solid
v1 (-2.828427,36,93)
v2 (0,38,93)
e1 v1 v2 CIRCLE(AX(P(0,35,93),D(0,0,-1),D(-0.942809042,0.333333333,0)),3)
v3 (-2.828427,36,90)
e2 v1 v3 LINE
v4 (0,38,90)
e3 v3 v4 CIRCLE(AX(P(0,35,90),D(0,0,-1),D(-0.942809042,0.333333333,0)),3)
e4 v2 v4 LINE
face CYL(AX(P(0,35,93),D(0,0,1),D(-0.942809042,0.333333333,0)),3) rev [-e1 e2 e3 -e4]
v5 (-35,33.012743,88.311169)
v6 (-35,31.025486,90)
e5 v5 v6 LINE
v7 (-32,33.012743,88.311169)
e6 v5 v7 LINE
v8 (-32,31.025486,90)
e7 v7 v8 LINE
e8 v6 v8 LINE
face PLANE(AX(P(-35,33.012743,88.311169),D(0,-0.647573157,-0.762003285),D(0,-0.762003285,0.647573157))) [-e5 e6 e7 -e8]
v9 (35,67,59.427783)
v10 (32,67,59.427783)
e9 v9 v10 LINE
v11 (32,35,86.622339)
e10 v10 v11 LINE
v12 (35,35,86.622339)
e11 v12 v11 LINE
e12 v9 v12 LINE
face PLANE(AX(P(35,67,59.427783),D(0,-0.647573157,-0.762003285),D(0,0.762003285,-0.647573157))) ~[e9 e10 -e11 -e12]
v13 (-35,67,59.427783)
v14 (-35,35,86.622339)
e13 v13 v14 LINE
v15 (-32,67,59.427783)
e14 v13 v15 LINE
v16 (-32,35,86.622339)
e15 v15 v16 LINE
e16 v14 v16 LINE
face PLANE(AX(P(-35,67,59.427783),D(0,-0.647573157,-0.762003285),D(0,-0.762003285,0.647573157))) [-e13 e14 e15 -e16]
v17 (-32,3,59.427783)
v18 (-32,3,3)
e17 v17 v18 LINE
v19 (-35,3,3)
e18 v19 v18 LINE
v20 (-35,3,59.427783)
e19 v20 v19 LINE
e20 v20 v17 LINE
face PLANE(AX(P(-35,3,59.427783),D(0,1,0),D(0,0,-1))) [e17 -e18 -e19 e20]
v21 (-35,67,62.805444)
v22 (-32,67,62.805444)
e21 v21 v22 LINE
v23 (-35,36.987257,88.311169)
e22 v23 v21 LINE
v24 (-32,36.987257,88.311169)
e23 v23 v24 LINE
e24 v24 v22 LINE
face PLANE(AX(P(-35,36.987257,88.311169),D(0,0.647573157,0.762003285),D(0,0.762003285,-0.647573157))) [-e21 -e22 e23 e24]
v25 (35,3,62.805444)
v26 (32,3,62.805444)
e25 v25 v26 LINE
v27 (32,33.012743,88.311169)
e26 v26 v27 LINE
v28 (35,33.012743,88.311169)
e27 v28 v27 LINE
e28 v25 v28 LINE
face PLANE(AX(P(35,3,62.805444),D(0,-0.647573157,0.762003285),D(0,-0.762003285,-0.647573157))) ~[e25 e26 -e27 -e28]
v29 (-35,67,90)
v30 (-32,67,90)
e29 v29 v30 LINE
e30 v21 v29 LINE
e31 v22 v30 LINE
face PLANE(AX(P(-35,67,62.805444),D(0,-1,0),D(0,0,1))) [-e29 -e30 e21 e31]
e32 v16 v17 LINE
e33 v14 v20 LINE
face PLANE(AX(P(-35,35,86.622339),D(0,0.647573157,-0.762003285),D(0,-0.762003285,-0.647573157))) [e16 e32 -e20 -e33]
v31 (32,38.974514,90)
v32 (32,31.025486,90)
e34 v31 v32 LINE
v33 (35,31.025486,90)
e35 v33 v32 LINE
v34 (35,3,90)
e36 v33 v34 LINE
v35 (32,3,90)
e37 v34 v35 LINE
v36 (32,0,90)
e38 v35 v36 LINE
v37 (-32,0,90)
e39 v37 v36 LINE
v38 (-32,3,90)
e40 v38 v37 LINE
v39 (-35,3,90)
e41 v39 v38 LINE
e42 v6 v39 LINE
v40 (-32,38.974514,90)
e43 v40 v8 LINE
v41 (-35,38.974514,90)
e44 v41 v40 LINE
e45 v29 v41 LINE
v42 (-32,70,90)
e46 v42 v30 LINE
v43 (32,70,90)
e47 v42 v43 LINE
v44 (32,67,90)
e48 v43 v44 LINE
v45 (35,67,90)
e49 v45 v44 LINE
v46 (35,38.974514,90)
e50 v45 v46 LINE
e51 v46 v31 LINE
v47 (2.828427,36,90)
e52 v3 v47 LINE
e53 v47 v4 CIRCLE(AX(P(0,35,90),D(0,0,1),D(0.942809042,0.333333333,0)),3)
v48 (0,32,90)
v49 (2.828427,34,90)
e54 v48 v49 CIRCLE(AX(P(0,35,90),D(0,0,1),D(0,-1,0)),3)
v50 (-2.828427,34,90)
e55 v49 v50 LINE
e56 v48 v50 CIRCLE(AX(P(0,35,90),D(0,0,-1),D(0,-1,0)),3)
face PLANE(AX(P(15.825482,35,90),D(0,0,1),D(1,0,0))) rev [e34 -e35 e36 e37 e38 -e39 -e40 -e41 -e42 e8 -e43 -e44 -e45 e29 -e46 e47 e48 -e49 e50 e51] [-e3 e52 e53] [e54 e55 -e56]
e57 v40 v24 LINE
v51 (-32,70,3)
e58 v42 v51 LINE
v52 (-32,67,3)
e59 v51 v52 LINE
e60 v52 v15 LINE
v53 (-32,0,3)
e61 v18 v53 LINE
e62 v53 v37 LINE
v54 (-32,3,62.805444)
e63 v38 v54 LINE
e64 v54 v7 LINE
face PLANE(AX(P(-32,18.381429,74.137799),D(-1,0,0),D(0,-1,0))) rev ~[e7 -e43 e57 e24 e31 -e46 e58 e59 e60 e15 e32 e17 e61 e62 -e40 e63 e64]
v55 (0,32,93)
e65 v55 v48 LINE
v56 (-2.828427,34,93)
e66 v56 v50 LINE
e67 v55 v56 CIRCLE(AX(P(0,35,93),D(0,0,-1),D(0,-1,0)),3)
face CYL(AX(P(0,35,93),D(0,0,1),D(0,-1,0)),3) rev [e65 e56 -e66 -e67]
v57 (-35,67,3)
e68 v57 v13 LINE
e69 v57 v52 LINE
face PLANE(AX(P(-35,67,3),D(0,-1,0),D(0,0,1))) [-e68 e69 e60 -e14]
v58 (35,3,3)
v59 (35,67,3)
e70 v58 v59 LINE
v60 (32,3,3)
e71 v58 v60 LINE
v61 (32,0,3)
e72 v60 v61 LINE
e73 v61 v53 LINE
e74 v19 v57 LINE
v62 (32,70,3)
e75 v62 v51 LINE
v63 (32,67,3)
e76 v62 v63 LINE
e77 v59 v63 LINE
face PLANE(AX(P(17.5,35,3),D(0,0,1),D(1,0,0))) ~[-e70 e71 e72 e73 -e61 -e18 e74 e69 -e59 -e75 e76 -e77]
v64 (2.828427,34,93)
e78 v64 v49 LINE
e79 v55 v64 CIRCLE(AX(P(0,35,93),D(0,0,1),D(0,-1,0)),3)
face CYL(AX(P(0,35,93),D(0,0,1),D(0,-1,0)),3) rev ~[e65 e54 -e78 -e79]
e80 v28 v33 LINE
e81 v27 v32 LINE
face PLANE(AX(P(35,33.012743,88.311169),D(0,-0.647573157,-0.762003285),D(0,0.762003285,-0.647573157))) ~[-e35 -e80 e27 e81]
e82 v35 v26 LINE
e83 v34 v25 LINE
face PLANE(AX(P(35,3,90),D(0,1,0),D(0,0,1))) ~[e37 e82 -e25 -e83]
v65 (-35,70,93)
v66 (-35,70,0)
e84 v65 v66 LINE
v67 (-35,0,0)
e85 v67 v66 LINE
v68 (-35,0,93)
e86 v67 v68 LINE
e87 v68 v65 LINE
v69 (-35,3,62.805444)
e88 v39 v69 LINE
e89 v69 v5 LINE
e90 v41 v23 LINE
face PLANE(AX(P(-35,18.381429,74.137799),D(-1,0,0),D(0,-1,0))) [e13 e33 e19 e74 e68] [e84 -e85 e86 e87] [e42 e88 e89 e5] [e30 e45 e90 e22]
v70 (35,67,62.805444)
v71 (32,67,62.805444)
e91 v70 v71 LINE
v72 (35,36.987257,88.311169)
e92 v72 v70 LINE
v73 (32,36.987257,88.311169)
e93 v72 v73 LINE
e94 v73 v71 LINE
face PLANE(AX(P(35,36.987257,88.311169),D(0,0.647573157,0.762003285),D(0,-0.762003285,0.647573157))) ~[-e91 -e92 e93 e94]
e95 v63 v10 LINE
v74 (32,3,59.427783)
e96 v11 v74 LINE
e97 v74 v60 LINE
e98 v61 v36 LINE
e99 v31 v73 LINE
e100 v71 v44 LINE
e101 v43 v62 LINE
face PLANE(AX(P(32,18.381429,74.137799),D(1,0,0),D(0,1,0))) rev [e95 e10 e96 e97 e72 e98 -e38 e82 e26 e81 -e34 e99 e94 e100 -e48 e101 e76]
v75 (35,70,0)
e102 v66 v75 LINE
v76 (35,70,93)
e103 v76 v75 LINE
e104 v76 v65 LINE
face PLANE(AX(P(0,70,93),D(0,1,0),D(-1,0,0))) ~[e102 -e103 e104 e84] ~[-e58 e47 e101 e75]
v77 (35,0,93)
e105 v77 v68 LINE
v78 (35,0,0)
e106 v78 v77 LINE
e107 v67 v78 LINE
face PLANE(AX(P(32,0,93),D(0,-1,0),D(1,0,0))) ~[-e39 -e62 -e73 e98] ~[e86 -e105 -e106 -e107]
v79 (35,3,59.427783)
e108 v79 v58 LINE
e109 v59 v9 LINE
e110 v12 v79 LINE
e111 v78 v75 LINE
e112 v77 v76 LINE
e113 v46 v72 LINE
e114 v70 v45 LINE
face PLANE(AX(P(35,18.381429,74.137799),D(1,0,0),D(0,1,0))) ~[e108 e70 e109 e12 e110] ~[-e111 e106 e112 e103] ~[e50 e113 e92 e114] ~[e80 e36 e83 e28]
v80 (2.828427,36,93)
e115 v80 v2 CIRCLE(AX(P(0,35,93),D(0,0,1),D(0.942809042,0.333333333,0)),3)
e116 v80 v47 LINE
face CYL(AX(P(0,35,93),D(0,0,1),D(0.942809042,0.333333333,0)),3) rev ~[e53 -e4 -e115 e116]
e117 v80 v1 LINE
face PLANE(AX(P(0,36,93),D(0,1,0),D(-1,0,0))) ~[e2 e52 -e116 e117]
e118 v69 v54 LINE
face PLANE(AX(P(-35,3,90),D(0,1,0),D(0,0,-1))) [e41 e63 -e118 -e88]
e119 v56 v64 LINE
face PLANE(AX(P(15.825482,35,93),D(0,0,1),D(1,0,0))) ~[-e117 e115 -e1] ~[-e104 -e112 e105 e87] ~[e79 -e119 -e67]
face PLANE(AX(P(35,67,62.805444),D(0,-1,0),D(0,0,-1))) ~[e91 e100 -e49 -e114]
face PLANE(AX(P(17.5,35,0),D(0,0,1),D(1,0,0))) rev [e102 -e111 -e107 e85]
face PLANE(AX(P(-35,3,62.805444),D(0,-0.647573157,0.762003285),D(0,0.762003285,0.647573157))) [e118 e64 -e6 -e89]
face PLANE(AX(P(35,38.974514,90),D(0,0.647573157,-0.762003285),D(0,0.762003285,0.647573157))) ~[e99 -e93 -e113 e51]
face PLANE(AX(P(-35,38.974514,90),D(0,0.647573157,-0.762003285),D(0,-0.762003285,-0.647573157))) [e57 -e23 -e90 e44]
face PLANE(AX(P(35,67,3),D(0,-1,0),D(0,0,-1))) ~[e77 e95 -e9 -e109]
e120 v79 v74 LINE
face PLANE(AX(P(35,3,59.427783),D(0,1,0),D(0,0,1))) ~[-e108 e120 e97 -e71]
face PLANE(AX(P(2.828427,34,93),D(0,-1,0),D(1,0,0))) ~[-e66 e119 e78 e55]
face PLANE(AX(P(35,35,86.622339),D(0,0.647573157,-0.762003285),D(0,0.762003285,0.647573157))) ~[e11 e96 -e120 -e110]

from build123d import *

# Parameters (mm, degrees)
F0_W     = 35
F0_H     = 70
F1_DEPTH = 3
F3_DEPTH = 3
F5_DEPTH = 3


# Not quite as in the source:
# - a feature names something its author has since deleted; it is built from what else it names


with BuildPart() as f1:
    # F0 (on Top) → F1 (new body)
    with BuildSketch(Plane.XY):
        with Locations((-17.5, 35)):
            Rectangle(F0_W, F0_H)
    extrude(amount=F1_DEPTH)

    # F2 (on face) → F3 (join)
    with BuildSketch(Plane(origin=(-35, 0, 0), x_dir=(0, -1, 0), z_dir=(-1, 0, 0))):
        Polygon((-35, 86.622338891), (-3, 59.4277828932), (-3, 62.8054440022), (-33.0127427803, 88.3111694455), align=None)
        Polygon((-67, 62.8054440022), (-67, 59.4277828932), (-35, 86.622338891), (-36.9872572197, 88.3111694455), align=None)
        Polygon((-70, 93), (-70, 90), (-67, 90), (-38.9745144394, 90), (-35, 90), (-35, 93), align=None)
        Polygon((0, 93), (-35, 93), (-35, 90), (-31.0254855606, 90), (-3, 90), (0, 90), align=None)
        Polygon((-35, 90), (-33.0127427803, 88.3111694455), (-31.0254855606, 90), align=None)
        Polygon((-36.9872572197, 88.3111694455), (-35, 86.622338891), (-33.0127427803, 88.3111694455), (-35, 90), align=None)
        Polygon((-35, 90), (-38.9745144394, 90), (-36.9872572197, 88.3111694455), align=None)
        Polygon((-70, 90), (-70, 3), (-67, 3), (-67, 59.4277828932), (-67, 62.8054440022), (-67, 90), align=None)
        Polygon((-3, 59.4277828932), (-3, 3), (0, 3), (0, 90), (-3, 90), (-3, 62.8054440022), align=None)
    extrude(amount=-F3_DEPTH)

    # F4 (on face) → F5 (join)
    with BuildSketch(Plane.XY.offset(93)):
        with BuildLine():
            Line((-32, 70), (-32, 0))
            Line((-32, 0), (0, 0))
            Line((0, 0), (0, 32))
            ThreePointArc((0, 32), (-1.7320508076, 32.5505102572), (-2.8284271247, 34))
            ThreePointArc((-2.8284271247, 34), (-3, 35), (-2.8284271247, 36))
            ThreePointArc((-2.8284271247, 36), (-1.7320508076, 37.4494897428), (0, 38))
            Line((0, 38), (0, 70))
            Line((0, 70), (-32, 70))
        make_face()
        with BuildLine():
            Line((-2.8284271247, 34), (0, 34))
            Line((0, 34), (0, 36))
            Line((0, 36), (-2.8284271247, 36))
            ThreePointArc((-2.8284271247, 36), (-3, 35), (-2.8284271247, 34))
        make_face()
    extrude(amount=-F5_DEPTH)

    # F6: F1 across plane


with BuildPart() as f1_1:
    add(f1.part)
    add(f1.part.mirror(Plane.YZ))


solid = f1_1.part
